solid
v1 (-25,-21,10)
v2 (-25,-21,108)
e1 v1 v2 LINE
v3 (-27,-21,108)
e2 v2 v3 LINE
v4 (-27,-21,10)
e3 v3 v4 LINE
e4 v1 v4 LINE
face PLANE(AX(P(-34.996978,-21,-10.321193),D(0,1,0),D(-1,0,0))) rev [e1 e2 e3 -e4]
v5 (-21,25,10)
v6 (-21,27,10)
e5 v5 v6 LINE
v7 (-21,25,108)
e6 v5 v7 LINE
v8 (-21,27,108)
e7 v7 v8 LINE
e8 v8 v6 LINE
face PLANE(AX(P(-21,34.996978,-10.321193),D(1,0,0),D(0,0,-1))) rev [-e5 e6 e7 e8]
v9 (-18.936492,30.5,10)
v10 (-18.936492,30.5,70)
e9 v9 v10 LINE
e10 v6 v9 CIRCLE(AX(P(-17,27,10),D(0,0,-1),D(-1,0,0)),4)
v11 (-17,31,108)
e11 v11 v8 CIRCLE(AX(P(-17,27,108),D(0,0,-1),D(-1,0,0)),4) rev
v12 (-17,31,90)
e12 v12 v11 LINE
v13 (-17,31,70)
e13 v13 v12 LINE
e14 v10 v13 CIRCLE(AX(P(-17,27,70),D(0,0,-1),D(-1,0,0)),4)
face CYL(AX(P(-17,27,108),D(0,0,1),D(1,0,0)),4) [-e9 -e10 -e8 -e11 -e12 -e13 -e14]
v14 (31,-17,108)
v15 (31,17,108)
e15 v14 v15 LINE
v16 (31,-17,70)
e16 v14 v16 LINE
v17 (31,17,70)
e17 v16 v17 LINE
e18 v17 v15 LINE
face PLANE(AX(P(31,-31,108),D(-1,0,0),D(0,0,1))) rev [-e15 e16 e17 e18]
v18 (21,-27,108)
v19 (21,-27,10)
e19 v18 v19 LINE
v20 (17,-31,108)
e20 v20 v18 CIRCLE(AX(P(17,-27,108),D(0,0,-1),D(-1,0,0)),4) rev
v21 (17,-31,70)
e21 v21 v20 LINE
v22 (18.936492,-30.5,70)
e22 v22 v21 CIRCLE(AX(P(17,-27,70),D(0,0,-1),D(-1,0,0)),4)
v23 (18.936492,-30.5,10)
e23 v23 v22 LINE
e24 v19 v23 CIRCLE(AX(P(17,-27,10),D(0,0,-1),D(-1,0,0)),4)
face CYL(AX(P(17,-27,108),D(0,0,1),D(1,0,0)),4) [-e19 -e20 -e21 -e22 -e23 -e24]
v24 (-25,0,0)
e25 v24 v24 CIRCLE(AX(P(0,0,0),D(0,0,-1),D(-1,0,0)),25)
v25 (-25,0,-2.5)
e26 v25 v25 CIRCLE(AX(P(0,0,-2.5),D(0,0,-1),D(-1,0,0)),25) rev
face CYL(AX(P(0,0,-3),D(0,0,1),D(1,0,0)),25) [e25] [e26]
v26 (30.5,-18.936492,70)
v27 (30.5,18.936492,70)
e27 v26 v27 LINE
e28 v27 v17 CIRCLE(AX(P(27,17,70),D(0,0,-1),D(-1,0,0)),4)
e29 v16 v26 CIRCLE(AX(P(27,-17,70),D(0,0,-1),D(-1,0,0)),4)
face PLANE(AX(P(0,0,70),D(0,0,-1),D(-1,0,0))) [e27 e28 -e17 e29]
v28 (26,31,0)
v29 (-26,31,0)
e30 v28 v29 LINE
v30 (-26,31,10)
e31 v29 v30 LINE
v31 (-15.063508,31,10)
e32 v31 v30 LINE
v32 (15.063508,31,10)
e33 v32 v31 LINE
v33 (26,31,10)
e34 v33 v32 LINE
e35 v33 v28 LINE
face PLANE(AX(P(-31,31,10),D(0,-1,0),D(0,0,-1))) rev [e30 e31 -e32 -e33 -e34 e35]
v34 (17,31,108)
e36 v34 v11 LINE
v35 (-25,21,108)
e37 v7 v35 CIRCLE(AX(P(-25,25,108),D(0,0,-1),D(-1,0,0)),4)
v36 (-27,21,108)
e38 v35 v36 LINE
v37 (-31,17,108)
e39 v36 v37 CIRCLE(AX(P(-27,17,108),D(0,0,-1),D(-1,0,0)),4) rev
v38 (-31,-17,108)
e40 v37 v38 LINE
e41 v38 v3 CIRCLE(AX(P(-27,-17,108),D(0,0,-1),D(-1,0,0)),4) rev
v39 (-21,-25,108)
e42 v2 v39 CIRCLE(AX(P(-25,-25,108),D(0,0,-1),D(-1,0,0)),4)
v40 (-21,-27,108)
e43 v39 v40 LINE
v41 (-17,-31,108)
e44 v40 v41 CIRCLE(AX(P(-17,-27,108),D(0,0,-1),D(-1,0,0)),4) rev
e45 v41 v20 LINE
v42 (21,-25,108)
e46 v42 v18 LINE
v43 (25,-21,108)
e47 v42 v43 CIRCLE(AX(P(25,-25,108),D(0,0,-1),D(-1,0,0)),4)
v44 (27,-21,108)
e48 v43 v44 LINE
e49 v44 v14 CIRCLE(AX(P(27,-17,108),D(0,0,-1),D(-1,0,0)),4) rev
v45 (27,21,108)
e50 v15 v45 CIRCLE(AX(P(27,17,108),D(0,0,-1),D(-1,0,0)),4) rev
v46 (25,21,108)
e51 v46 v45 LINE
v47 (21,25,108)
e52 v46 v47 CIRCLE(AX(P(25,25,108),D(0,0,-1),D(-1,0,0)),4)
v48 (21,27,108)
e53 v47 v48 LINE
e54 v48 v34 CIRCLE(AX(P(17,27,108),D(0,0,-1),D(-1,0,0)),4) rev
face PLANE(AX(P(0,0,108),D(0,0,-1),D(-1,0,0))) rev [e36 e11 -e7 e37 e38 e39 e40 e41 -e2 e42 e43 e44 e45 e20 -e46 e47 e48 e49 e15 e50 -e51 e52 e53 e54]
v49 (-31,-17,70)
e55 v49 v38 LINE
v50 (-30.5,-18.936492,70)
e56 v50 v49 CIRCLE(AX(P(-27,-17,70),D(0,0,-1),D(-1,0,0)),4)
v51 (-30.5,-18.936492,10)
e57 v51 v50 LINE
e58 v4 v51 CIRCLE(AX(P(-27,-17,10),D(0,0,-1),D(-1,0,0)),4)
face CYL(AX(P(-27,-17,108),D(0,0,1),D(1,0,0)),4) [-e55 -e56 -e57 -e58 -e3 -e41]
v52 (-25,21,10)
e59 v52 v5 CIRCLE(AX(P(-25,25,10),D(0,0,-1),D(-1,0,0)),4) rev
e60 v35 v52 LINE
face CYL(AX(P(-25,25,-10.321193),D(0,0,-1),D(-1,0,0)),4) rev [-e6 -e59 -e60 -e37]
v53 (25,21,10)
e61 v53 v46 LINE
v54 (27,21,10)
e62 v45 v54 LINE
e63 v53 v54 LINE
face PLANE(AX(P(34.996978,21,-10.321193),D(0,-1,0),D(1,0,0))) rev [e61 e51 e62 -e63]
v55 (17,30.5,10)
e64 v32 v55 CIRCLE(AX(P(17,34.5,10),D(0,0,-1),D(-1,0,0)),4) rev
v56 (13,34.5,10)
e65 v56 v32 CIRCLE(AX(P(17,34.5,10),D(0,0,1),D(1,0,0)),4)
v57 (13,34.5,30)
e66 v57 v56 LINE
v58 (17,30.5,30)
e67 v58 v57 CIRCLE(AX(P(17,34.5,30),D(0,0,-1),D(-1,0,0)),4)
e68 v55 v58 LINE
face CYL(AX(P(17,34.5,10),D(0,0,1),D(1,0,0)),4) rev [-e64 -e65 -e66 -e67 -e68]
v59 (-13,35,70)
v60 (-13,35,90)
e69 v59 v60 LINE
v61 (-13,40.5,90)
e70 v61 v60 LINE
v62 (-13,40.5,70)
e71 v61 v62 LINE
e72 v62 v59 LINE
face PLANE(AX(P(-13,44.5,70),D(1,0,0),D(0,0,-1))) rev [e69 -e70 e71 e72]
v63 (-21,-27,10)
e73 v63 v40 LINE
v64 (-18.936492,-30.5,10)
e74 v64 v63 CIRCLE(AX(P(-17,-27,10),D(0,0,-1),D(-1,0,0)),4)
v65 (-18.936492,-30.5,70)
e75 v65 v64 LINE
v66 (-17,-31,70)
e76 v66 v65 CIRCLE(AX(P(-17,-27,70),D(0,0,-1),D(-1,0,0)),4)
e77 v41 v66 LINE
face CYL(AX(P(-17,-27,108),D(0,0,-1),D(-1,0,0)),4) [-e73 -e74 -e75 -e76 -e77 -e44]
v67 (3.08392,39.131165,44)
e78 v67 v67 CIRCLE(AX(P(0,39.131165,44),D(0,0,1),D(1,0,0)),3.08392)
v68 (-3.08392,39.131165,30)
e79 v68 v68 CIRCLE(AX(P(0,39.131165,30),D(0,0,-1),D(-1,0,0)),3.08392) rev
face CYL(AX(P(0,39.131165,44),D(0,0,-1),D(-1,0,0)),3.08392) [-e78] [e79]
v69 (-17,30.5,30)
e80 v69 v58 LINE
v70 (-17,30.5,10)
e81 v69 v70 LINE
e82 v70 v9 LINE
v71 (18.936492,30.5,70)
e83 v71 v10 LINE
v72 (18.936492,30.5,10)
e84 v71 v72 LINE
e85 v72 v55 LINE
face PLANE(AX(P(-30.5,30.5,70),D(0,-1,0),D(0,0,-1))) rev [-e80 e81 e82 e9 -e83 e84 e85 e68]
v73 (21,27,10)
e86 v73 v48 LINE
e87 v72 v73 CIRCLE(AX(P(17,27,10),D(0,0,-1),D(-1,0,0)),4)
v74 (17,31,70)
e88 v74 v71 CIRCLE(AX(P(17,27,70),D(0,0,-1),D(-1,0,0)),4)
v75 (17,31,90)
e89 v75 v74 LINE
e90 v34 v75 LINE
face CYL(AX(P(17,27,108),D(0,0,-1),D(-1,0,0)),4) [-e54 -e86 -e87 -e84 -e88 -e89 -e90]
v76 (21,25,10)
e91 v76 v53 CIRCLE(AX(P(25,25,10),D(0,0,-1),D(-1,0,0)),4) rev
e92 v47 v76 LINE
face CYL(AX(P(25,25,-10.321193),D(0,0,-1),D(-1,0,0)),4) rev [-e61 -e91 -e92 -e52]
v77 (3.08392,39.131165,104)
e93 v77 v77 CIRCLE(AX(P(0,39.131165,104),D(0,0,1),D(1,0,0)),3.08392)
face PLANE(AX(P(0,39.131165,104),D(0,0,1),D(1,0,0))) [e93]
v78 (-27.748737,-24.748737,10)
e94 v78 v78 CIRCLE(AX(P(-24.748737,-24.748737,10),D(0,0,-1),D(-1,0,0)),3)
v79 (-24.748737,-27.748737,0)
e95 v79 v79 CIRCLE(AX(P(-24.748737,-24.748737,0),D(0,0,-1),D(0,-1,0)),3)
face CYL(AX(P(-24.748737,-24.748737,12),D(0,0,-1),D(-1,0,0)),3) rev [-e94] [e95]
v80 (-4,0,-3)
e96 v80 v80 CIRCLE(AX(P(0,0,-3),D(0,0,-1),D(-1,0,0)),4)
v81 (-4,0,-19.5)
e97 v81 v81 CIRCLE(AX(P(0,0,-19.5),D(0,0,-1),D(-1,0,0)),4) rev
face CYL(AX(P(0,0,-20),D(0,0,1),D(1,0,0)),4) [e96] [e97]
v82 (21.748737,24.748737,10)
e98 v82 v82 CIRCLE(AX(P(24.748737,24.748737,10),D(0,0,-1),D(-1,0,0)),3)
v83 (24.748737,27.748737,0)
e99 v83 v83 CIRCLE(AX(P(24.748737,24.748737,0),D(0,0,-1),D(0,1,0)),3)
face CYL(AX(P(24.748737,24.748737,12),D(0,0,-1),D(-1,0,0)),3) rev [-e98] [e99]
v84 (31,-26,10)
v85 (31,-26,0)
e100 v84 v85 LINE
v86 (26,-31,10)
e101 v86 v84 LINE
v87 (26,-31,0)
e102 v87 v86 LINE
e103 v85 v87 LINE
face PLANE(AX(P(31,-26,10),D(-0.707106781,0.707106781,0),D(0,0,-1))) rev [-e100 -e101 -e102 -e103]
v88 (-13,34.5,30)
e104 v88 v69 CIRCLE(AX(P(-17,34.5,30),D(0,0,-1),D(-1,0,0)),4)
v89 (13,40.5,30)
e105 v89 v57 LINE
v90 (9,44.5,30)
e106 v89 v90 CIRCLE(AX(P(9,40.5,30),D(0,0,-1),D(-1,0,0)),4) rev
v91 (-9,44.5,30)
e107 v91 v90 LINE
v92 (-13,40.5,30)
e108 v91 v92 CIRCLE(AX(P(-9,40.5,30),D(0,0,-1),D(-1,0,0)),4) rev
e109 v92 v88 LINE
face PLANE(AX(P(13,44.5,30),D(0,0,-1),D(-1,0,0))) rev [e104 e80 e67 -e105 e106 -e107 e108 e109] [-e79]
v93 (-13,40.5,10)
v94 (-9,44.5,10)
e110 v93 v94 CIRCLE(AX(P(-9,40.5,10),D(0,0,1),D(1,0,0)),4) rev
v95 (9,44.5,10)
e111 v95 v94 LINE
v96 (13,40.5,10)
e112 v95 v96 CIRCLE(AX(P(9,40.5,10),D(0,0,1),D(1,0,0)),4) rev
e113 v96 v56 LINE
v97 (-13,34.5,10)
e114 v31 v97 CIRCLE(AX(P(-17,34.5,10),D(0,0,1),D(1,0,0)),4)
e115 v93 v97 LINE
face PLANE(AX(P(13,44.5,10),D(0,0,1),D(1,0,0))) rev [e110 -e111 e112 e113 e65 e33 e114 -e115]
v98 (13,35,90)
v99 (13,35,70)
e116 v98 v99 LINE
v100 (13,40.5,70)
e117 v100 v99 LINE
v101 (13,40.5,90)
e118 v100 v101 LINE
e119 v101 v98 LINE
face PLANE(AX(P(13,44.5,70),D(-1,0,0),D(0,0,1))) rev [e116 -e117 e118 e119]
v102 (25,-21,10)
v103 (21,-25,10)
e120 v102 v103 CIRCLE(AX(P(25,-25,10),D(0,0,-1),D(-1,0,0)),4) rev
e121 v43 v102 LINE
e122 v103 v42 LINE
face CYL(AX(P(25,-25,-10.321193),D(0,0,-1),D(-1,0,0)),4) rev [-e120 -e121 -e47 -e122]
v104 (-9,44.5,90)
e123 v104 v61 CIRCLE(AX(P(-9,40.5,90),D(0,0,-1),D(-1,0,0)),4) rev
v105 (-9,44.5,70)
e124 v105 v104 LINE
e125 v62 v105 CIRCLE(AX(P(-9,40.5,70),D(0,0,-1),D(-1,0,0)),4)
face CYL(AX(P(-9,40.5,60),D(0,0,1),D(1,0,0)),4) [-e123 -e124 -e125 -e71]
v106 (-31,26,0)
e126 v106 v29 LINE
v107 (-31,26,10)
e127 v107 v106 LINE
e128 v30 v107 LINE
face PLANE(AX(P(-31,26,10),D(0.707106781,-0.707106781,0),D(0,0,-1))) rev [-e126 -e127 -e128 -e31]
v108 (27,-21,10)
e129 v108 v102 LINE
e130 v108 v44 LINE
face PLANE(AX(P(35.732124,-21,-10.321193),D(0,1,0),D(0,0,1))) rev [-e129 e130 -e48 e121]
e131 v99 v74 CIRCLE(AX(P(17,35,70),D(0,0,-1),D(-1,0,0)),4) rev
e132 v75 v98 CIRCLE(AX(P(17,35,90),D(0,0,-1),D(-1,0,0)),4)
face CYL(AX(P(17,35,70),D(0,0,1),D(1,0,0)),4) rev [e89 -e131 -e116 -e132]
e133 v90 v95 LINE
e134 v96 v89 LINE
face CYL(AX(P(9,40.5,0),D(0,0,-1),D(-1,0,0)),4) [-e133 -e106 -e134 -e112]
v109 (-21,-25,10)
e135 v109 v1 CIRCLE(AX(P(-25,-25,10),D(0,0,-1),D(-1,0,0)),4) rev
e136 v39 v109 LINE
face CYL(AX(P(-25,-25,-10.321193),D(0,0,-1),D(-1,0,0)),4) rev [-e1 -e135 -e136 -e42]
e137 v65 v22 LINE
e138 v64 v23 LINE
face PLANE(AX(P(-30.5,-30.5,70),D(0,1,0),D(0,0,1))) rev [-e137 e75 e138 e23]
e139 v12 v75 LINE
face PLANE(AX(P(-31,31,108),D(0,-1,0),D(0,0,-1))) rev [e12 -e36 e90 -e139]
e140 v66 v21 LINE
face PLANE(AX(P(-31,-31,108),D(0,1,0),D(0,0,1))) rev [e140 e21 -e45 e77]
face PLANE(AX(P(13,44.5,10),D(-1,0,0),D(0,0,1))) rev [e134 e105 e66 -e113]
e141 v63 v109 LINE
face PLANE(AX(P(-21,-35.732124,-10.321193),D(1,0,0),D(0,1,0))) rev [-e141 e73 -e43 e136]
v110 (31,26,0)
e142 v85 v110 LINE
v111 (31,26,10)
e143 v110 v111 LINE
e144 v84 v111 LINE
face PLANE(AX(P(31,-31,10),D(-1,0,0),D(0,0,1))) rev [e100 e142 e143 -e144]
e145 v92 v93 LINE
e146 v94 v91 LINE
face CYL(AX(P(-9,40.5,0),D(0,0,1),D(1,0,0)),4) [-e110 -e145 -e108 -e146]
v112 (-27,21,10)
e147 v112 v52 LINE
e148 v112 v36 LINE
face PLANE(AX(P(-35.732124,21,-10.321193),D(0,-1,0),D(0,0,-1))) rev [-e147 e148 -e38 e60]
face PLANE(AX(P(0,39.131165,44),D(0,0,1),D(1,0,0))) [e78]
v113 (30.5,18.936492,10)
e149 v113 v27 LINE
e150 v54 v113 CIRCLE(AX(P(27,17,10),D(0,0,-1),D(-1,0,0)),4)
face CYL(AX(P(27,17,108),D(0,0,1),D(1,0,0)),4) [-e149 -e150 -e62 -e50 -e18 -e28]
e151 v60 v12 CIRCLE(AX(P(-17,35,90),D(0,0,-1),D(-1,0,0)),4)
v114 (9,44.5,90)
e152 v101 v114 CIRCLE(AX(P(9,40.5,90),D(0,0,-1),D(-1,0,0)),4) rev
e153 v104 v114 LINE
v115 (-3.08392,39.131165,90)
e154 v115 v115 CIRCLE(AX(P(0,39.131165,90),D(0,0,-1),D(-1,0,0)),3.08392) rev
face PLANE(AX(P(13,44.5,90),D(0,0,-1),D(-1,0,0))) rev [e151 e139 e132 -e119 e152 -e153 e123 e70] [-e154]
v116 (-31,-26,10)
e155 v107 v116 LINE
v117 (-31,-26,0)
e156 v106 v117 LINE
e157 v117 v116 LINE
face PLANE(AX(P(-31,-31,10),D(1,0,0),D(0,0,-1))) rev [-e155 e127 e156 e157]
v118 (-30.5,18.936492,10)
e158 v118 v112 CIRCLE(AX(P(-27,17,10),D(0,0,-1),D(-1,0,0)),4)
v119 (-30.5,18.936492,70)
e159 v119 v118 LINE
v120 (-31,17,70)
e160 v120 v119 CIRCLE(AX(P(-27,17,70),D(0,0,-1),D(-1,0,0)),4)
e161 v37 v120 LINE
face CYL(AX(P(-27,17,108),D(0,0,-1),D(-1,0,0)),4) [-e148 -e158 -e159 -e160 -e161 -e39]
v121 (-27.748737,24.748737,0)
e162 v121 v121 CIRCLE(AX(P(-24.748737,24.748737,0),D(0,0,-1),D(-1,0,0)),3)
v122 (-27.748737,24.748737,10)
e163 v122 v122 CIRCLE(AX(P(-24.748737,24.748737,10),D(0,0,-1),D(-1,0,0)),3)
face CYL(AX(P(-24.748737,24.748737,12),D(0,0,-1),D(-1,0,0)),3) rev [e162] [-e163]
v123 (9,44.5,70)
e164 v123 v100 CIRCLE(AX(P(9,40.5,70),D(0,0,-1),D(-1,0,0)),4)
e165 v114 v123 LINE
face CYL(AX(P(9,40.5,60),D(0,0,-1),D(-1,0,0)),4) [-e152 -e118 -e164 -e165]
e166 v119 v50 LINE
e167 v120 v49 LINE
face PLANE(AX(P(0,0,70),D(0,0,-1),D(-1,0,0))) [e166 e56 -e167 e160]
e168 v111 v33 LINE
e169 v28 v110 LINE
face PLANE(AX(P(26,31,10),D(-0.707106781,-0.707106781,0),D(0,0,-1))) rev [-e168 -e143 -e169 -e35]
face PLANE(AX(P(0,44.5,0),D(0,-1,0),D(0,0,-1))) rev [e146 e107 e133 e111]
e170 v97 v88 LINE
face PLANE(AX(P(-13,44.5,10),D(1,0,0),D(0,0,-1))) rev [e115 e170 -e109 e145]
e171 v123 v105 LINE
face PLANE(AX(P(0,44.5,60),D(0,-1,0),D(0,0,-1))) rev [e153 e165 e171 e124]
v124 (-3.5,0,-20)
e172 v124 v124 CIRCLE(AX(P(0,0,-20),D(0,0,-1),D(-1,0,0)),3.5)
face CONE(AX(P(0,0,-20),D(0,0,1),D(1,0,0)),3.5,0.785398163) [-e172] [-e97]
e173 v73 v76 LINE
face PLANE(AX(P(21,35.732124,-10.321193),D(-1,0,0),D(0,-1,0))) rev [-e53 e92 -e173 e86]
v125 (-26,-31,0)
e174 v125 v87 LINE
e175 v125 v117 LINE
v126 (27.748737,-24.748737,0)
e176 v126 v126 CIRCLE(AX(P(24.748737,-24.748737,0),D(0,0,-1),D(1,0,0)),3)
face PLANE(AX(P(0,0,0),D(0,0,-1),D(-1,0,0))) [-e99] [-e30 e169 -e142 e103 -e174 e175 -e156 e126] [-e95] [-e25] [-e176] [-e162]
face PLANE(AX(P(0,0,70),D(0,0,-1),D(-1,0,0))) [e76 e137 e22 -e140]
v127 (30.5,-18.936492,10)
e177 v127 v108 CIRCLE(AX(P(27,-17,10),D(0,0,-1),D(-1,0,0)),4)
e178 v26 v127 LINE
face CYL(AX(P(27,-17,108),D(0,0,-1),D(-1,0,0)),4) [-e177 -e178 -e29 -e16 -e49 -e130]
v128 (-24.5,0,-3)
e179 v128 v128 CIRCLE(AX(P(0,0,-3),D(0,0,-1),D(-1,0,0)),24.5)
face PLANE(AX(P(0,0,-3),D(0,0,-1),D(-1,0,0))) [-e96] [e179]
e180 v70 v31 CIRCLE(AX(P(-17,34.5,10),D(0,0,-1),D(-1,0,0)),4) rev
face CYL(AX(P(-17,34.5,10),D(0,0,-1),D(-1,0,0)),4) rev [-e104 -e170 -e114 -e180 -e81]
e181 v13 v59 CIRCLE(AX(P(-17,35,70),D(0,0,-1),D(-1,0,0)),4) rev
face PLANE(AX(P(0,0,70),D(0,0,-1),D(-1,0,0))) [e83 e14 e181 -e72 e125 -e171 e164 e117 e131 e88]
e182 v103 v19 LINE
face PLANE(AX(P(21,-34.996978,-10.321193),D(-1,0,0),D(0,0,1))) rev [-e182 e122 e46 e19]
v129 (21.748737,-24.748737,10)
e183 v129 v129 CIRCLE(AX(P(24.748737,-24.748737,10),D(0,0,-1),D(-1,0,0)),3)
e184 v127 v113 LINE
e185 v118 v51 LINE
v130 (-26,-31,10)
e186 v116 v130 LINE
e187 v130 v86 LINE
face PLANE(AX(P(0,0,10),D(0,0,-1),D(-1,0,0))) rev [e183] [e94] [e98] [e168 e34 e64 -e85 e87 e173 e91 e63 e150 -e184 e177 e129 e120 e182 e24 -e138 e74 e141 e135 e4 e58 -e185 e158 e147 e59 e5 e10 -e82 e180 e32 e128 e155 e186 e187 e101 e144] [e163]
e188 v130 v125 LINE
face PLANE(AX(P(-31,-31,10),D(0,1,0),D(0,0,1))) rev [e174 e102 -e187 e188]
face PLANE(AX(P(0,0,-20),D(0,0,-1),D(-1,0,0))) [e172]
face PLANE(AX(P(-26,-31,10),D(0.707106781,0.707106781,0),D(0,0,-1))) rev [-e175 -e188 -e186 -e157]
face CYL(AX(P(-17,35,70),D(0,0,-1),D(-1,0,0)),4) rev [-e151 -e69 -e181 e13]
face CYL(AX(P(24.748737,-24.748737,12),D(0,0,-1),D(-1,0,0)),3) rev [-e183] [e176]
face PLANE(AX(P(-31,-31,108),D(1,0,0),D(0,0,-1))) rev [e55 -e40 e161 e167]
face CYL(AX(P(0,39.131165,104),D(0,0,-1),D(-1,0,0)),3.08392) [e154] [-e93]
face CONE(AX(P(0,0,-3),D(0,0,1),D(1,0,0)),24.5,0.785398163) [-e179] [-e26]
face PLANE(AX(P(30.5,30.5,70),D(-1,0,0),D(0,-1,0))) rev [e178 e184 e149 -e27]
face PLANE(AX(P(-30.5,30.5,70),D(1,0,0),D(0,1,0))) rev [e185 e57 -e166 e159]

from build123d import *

# Parameters (mm, degrees)
SKETCH_1_W               = 62
SKETCH_1_H               = 62
EXTRUDE_1_DEPTH          = 10
SKETCH_2_W               = 61
SKETCH_2_H               = 61
EXTRUDE_2_DEPTH          = 60
SKETCH_3_W               = 62
SKETCH_3_H               = 62
EXTRUDE_3_DEPTH          = 38
CUT_EXTRUDE_START        = -98
SKETCH_4_W               = 14.732123786
SKETCH_4_H               = 13.996978426
CUT_EXTRUDE_1_DEPTH      = 98
FILLET_1_R               = 4
FILLET_3_R               = 4
SKETCH_5_R               = 4
EXTRUDE_4_DEPTH          = 20
PATTERN_CIRCULAR_4_COUNT = 4
FILLET_4_R               = 4
FILLET_5_R               = 4
CHAMFER_1_SIZE           = 5
SKETCH_6_R               = 25
EXTRUDE_5_DEPTH          = 3
SKETCH_7_R               = 3
CUT_EXTRUDE_2_DEPTH      = 12
PATTERN_CIRCULAR_5_COUNT = 4
CHAMFER_2_SIZE           = 0.5
SKETCH_8_W               = 26
SKETCH_8_H               = 20
EXTRUDE_6_DEPTH          = 14
SKETCH_9_R               = 3.083920488
EXTRUDE_7_DEPTH          = 14
FILLET_START             = 9
FILLET_6_DEPTH           = 21
FILLET_START_2           = 10
FILLET_6_2_DEPTH         = 20
PATTERN_LINEAR_2_COUNT   = 2
PATTERN_LINEAR_2_PITCH   = 60
FILLET_7_R               = 4


with BuildPart() as part:
    # 草图1 → 凸台-拉伸1 (new body)
    with BuildSketch(Plane.XY):
        Rectangle(SKETCH_1_W, SKETCH_1_H)
    extrude(amount=EXTRUDE_1_DEPTH)

    # 草图2 → 凸台-拉伸2 (add)
    with BuildSketch(Plane.XY.offset(10)):
        Rectangle(SKETCH_2_W, SKETCH_2_H)
    extrude(amount=EXTRUDE_2_DEPTH)

    # 草图3 → 凸台-拉伸3 (add)
    with BuildSketch(Plane.XY.offset(70)):
        Rectangle(SKETCH_3_W, SKETCH_3_H)
    extrude(amount=EXTRUDE_3_DEPTH)

    # 草图4 → 切除-拉伸1 (cut)
    with BuildSketch(Plane.XY.offset(108).offset(CUT_EXTRUDE_START)):
        with Locations((-28.366061893, 27.998489213)):
            Rectangle(SKETCH_4_W, SKETCH_4_H)
    cut_extrude_1 = extrude(amount=CUT_EXTRUDE_1_DEPTH, mode=Mode.SUBTRACT)

    # 圆角1
    fillet_1_edges = [part.edges().sort_by_distance(p)[0] for p in [
        (-21, 21, 59),
    ]]
    fillet(fillet_1_edges, radius=FILLET_1_R)

    # 圆角3
    fillet_3_edges = [part.edges().sort_by_distance(p)[0] for p in [
        (-31, 21, 89),
        (-21, 31, 89),
    ]]
    fillet(fillet_3_edges, radius=FILLET_3_R)

    # 草图5 → 凸台-拉伸4 (add)
    with BuildSketch(Plane(origin=(0, 0, 0), x_dir=(-1, 0, 0), z_dir=(0, 0, -1))):
        Circle(SKETCH_5_R)
    extrude(amount=EXTRUDE_4_DEPTH)

    # 阵列(圆周)4: 切除-拉伸1 ×4 about axis
    pattern_circular_4_axis = Axis((0, 0, 0), (0, 0, 1))
    for i in range(1, PATTERN_CIRCULAR_4_COUNT):
        add(cut_extrude_1.rotate(pattern_circular_4_axis, i * 360 / PATTERN_CIRCULAR_4_COUNT), mode=Mode.SUBTRACT)

    # 圆角4
    fillet_4_edges = [part.edges().sort_by_distance(p)[0] for p in [
        (-21, -21, 59),
        (21, -21, 59),
        (21, 21, 59),
    ]]
    fillet(fillet_4_edges, radius=FILLET_4_R)

    # 圆角5
    fillet_5_edges = [part.edges().sort_by_distance(p)[0] for p in [
        (-31, -21, 89),
        (-21, -31, 89),
        (21, -31, 89),
        (31, -21, 89),
        (31, 21, 89),
        (21, 31, 89),
    ]]
    fillet(fillet_5_edges, radius=FILLET_5_R)

    # 倒角1
    chamfer_1_edges = [part.edges().sort_by_distance(p)[0] for p in [
        (31, -31, 5),
        (-31, -31, 5),
        (-31, 31, 5),
        (31, 31, 5),
    ]]
    chamfer(chamfer_1_edges, length=CHAMFER_1_SIZE)

    # 草图6 → 凸台-拉伸5 (add)
    with BuildSketch(Plane(origin=(0, 0, 0), x_dir=(-1, 0, 0), z_dir=(0, 0, -1))):
        Circle(SKETCH_6_R)
    extrude(amount=EXTRUDE_5_DEPTH)

    # 草图7 → 切除-拉伸2 (cut)
    with BuildSketch(Plane(origin=(0, 0, 0), x_dir=(-1, 0, 0), z_dir=(0, 0, -1))):
        with Locations((24.748737342, 24.748737342)):
            Circle(SKETCH_7_R)
    cut_extrude_2 = extrude(amount=-CUT_EXTRUDE_2_DEPTH, mode=Mode.SUBTRACT)

    # 阵列(圆周)5: 切除-拉伸2 ×4 about axis
    pattern_circular_5_axis = Axis((0, 0, 0), (0, 0, 1))
    for i in range(1, PATTERN_CIRCULAR_5_COUNT):
        add(cut_extrude_2.rotate(pattern_circular_5_axis, i * 360 / PATTERN_CIRCULAR_5_COUNT), mode=Mode.SUBTRACT)

    # 倒角2
    chamfer_2_edges = [part.edges().sort_by_distance(p)[0] for p in [
        (25, 0, -3),
        (4, 0, -20),
    ]]
    chamfer(chamfer_2_edges, length=CHAMFER_2_SIZE)

    # 草图8 → 凸台-拉伸6 (add)
    with BuildSketch(Plane(origin=(0, 30.5, 0), x_dir=(1, 0, 0), z_dir=(0, 1, 0))):
        with Locations((0, -20)):
            Rectangle(SKETCH_8_W, SKETCH_8_H)
    extrude_6 = extrude(amount=EXTRUDE_6_DEPTH)

    # 草图9 → 凸台-拉伸7 (add)
    with BuildSketch(Plane.XY.offset(30)):
        with Locations(Location((0, 39.131165124, 0), (0, 0, 180))):
            Circle(SKETCH_9_R)
    extrude_7 = extrude(amount=EXTRUDE_7_DEPTH)

    # 圆角6: read off the stored shape, not the designer's step
    # 圆角6 outline → 圆角6 (cut)
    with BuildSketch(Plane.XY.offset(FILLET_START)):
        with BuildLine():
            ThreePointArc((9, 44.5), (11.828427125, 43.328427125), (13, 40.5))
            Line((13, 40.5), (13, 44.5))
            Line((13, 44.5), (9, 44.5))
        make_face()
        with BuildLine():
            ThreePointArc((-13, 40.5), (-11.828427125, 43.328427125), (-9, 44.5))
            Line((-9, 44.5), (-13, 44.5))
            Line((-13, 44.5), (-13, 40.5))
        make_face()
    extrude(amount=FILLET_6_DEPTH, mode=Mode.SUBTRACT)

    # Fillet 6 2 outline → Fillet 6 2 (add)
    with BuildSketch(Plane.XY.offset(FILLET_START_2)):
        with BuildLine():
            ThreePointArc((17, 30.5), (14.171572875, 31.671572875), (13, 34.5))
            Line((13, 34.5), (13, 30.5))
            Line((13, 30.5), (17, 30.5))
        make_face()
        with BuildLine():
            Line((-17, 30.5), (-13, 30.5))
            Line((-13, 30.5), (-13, 34.5))
            ThreePointArc((-13, 34.5), (-14.171572875, 31.671572875), (-17, 30.5))
        make_face()
    extrude(amount=FILLET_6_2_DEPTH)

    # 阵列(线性)2: 凸台-拉伸6, 凸台-拉伸7 ×2
    with Locations(*[(0, 0, i * PATTERN_LINEAR_2_PITCH) for i in range(1, PATTERN_LINEAR_2_COUNT)]):
        add(extrude_6)
        add(extrude_7)

    # 圆角7
    fillet_7_edges = [part.edges().sort_by_distance(p)[0] for p in [
        (13, 31, 80),
        (-13, 31, 80),
    ]]
    fillet(fillet_7_edges, radius=FILLET_7_R - 0.0001)  # a hair under: the kernel refuses the full size
    fillet_7_2_edges = [part.edges().sort_by_distance(p)[0] for p in [
        (13, 44.5, 80),
        (-13, 44.5, 80),
    ]]
    fillet(fillet_7_2_edges, radius=FILLET_7_R)


solid = part.part
